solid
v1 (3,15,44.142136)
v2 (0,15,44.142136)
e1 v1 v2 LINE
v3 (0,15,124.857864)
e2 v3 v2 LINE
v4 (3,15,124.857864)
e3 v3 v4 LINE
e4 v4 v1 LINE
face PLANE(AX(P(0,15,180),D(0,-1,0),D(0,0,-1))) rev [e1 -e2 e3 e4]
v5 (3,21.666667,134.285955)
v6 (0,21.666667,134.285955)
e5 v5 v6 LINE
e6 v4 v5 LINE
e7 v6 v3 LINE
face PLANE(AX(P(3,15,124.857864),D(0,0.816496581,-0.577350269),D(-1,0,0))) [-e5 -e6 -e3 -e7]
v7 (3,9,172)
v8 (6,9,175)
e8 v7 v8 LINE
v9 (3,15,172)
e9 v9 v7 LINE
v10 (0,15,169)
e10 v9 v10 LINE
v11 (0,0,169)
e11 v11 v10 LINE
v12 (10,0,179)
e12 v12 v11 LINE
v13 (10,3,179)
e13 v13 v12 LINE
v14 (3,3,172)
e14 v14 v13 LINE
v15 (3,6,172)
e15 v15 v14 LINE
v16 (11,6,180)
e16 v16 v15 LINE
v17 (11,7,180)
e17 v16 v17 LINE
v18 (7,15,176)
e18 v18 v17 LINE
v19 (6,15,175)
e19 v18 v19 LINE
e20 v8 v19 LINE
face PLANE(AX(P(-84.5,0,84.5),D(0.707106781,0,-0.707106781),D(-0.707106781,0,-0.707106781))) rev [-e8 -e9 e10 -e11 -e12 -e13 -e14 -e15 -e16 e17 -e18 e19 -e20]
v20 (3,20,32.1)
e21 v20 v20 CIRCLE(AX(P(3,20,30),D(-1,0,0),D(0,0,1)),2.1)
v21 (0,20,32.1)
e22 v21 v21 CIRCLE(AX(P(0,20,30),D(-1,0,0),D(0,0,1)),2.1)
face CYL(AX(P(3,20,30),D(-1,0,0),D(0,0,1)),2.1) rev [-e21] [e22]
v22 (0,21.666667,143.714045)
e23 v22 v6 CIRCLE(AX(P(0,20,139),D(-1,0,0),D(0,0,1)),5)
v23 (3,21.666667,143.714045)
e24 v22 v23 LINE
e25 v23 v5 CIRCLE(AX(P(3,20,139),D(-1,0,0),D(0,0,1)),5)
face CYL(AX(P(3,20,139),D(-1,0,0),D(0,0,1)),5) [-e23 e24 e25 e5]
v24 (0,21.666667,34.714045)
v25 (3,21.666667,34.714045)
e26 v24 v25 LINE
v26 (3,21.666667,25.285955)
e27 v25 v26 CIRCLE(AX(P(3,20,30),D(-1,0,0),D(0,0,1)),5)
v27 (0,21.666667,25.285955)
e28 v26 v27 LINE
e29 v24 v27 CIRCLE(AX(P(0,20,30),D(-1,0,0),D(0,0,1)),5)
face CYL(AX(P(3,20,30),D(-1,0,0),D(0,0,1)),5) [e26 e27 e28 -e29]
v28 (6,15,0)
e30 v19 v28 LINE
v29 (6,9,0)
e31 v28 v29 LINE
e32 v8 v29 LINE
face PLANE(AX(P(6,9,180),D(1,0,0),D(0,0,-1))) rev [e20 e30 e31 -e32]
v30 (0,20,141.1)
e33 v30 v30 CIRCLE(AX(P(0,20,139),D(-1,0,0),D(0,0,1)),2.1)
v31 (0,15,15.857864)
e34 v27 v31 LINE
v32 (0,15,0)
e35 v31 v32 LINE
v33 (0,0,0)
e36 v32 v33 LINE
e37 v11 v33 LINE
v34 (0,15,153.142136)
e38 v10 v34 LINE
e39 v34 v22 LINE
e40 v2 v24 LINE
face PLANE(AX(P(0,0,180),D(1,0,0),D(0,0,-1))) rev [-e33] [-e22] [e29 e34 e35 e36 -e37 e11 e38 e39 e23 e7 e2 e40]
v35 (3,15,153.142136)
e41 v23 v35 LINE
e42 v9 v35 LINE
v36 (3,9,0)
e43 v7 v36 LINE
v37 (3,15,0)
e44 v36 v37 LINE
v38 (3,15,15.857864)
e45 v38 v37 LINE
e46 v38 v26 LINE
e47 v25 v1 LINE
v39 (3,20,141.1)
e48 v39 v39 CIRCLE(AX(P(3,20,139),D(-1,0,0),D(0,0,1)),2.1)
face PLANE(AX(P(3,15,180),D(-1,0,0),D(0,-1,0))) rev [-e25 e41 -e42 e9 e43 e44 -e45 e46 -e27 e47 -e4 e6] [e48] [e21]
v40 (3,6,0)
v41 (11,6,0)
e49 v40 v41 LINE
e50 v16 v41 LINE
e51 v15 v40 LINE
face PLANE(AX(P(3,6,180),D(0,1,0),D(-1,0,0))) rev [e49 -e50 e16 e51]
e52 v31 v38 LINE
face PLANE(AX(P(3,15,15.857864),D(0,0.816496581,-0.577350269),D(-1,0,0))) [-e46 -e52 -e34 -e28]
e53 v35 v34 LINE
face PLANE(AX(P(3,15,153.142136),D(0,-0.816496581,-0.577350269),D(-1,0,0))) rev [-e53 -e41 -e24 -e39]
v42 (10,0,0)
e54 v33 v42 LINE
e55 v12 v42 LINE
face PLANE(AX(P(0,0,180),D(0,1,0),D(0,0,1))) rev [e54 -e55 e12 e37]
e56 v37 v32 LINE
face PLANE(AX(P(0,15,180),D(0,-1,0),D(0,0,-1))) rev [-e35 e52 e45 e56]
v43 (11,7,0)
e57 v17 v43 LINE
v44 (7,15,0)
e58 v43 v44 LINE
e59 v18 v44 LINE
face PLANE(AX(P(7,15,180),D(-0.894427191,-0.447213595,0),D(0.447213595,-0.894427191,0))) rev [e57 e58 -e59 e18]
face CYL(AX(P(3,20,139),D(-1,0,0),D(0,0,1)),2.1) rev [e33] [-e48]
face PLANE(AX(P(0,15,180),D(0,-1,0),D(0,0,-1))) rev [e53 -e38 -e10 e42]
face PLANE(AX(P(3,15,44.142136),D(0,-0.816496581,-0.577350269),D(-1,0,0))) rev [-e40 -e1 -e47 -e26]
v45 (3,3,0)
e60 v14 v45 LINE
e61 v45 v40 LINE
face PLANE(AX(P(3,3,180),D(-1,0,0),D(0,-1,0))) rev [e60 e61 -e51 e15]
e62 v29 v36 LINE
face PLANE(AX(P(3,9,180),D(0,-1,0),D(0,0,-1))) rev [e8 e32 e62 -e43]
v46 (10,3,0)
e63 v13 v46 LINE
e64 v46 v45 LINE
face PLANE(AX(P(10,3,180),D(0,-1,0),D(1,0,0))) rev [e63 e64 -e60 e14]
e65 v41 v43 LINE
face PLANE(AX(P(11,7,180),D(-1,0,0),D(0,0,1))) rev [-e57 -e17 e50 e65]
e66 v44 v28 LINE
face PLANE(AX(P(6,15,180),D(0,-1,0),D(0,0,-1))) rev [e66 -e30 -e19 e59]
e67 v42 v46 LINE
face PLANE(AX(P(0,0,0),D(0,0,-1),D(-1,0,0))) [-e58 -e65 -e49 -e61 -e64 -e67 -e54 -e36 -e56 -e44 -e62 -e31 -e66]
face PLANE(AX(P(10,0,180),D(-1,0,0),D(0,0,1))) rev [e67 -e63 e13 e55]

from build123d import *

# Parameters (mm, degrees)
DODANIE_WYCI_GNI_CIE1_DEPTH = 180
WYTNIJ_WYCI_GNI_CIE1_DEPTH  = 181.958558792
SZKIC3_R                    = 2.1
DODANIE_WYCI_GNI_CIE2_DEPTH = 3
SFAZOWANIE1_DEPTH           = 3


with BuildPart() as part:
    # Szkic1 → Dodanie-wyciągnięcie1 (new body)
    with BuildSketch(Plane.XY):
        Polygon((0, 0), (10, 0), (10, 3), (3, 3), (3, 6), (11, 6), (11, 7), (7, 15), (6, 15), (6, 9), (3, 9), (3, 15), (0, 15), align=None)
    extrude(amount=DODANIE_WYCI_GNI_CIE1_DEPTH)

    # Szkic2 → Wytnij-wyciągnięcie1 (cut, through all)
    with BuildSketch(Plane(origin=(0, 15, 0), x_dir=(1, 0, 0), z_dir=(0, 1, 0))):
        Polygon((0, -180), (11, -180), (0, -169), align=None)
    extrude(amount=-WYTNIJ_WYCI_GNI_CIE1_DEPTH, mode=Mode.SUBTRACT)

    # Szkic3 → Dodanie-wyciągnięcie2 (add)
    # profile 1 of 2: a face of its own
    with BuildSketch(Plane.ZY):
        with BuildLine():
            Line((25, 20), (25, 11.336506418))
            Line((25, 11.336506418), (35, 11.336506418))
            Line((35, 11.336506418), (35, 20))
            ThreePointArc((35, 20), (30, 25), (25, 20))
        make_face()
        with Locations((30, 20)):
            Circle(SZKIC3_R, mode=Mode.SUBTRACT)
    # profile 2 of 2: a face of its own
    with BuildSketch(Plane.ZY):
        with BuildLine():
            Line((134, 20), (134, 11.336506418))
            Line((134, 11.336506418), (144, 11.336506418))
            Line((144, 11.336506418), (144, 20))
            ThreePointArc((144, 20), (139, 25), (134, 20))
        make_face()
        with Locations((139, 20)):
            Circle(SZKIC3_R, mode=Mode.SUBTRACT)
    extrude(amount=-DODANIE_WYCI_GNI_CIE2_DEPTH)

    # Sfazowanie1: read off the stored shape, not the designer's step
    # Sfazowanie1 outline → Sfazowanie1 (add)
    with BuildSketch(Plane.YZ):
        with BuildLine():
            Line((15, 134), (15, 124.857864376))
            Line((15, 124.857864376), (21.666666667, 134.285954792))
            ThreePointArc((21.666666667, 134.285954792), (20.845509894, 134.072007202), (20, 134))
            Line((20, 134), (15, 134))
        make_face()
        with BuildLine():
            Line((15, 15.857864376), (21.666666667, 25.285954792))
            ThreePointArc((21.666666667, 25.285954792), (20.845509894, 25.072007202), (20, 25))
            Line((20, 25), (15, 25))
            Line((15, 25), (15, 15.857864376))
        make_face()
        with BuildLine():
            Line((21.666666667, 34.714045208), (15, 44.142135624))
            Line((15, 44.142135624), (15, 35))
            Line((15, 35), (20, 35))
            ThreePointArc((20, 35), (20.845509894, 34.927992798), (21.666666667, 34.714045208))
        make_face()
        with BuildLine():
            ThreePointArc((20, 144), (20.845509894, 143.927992798), (21.666666667, 143.714045208))
            Line((21.666666667, 143.714045208), (15, 153.142135624))
            Line((15, 153.142135624), (15, 144))
            Line((15, 144), (20, 144))
        make_face()
    extrude(amount=SFAZOWANIE1_DEPTH)


solid = part.part
